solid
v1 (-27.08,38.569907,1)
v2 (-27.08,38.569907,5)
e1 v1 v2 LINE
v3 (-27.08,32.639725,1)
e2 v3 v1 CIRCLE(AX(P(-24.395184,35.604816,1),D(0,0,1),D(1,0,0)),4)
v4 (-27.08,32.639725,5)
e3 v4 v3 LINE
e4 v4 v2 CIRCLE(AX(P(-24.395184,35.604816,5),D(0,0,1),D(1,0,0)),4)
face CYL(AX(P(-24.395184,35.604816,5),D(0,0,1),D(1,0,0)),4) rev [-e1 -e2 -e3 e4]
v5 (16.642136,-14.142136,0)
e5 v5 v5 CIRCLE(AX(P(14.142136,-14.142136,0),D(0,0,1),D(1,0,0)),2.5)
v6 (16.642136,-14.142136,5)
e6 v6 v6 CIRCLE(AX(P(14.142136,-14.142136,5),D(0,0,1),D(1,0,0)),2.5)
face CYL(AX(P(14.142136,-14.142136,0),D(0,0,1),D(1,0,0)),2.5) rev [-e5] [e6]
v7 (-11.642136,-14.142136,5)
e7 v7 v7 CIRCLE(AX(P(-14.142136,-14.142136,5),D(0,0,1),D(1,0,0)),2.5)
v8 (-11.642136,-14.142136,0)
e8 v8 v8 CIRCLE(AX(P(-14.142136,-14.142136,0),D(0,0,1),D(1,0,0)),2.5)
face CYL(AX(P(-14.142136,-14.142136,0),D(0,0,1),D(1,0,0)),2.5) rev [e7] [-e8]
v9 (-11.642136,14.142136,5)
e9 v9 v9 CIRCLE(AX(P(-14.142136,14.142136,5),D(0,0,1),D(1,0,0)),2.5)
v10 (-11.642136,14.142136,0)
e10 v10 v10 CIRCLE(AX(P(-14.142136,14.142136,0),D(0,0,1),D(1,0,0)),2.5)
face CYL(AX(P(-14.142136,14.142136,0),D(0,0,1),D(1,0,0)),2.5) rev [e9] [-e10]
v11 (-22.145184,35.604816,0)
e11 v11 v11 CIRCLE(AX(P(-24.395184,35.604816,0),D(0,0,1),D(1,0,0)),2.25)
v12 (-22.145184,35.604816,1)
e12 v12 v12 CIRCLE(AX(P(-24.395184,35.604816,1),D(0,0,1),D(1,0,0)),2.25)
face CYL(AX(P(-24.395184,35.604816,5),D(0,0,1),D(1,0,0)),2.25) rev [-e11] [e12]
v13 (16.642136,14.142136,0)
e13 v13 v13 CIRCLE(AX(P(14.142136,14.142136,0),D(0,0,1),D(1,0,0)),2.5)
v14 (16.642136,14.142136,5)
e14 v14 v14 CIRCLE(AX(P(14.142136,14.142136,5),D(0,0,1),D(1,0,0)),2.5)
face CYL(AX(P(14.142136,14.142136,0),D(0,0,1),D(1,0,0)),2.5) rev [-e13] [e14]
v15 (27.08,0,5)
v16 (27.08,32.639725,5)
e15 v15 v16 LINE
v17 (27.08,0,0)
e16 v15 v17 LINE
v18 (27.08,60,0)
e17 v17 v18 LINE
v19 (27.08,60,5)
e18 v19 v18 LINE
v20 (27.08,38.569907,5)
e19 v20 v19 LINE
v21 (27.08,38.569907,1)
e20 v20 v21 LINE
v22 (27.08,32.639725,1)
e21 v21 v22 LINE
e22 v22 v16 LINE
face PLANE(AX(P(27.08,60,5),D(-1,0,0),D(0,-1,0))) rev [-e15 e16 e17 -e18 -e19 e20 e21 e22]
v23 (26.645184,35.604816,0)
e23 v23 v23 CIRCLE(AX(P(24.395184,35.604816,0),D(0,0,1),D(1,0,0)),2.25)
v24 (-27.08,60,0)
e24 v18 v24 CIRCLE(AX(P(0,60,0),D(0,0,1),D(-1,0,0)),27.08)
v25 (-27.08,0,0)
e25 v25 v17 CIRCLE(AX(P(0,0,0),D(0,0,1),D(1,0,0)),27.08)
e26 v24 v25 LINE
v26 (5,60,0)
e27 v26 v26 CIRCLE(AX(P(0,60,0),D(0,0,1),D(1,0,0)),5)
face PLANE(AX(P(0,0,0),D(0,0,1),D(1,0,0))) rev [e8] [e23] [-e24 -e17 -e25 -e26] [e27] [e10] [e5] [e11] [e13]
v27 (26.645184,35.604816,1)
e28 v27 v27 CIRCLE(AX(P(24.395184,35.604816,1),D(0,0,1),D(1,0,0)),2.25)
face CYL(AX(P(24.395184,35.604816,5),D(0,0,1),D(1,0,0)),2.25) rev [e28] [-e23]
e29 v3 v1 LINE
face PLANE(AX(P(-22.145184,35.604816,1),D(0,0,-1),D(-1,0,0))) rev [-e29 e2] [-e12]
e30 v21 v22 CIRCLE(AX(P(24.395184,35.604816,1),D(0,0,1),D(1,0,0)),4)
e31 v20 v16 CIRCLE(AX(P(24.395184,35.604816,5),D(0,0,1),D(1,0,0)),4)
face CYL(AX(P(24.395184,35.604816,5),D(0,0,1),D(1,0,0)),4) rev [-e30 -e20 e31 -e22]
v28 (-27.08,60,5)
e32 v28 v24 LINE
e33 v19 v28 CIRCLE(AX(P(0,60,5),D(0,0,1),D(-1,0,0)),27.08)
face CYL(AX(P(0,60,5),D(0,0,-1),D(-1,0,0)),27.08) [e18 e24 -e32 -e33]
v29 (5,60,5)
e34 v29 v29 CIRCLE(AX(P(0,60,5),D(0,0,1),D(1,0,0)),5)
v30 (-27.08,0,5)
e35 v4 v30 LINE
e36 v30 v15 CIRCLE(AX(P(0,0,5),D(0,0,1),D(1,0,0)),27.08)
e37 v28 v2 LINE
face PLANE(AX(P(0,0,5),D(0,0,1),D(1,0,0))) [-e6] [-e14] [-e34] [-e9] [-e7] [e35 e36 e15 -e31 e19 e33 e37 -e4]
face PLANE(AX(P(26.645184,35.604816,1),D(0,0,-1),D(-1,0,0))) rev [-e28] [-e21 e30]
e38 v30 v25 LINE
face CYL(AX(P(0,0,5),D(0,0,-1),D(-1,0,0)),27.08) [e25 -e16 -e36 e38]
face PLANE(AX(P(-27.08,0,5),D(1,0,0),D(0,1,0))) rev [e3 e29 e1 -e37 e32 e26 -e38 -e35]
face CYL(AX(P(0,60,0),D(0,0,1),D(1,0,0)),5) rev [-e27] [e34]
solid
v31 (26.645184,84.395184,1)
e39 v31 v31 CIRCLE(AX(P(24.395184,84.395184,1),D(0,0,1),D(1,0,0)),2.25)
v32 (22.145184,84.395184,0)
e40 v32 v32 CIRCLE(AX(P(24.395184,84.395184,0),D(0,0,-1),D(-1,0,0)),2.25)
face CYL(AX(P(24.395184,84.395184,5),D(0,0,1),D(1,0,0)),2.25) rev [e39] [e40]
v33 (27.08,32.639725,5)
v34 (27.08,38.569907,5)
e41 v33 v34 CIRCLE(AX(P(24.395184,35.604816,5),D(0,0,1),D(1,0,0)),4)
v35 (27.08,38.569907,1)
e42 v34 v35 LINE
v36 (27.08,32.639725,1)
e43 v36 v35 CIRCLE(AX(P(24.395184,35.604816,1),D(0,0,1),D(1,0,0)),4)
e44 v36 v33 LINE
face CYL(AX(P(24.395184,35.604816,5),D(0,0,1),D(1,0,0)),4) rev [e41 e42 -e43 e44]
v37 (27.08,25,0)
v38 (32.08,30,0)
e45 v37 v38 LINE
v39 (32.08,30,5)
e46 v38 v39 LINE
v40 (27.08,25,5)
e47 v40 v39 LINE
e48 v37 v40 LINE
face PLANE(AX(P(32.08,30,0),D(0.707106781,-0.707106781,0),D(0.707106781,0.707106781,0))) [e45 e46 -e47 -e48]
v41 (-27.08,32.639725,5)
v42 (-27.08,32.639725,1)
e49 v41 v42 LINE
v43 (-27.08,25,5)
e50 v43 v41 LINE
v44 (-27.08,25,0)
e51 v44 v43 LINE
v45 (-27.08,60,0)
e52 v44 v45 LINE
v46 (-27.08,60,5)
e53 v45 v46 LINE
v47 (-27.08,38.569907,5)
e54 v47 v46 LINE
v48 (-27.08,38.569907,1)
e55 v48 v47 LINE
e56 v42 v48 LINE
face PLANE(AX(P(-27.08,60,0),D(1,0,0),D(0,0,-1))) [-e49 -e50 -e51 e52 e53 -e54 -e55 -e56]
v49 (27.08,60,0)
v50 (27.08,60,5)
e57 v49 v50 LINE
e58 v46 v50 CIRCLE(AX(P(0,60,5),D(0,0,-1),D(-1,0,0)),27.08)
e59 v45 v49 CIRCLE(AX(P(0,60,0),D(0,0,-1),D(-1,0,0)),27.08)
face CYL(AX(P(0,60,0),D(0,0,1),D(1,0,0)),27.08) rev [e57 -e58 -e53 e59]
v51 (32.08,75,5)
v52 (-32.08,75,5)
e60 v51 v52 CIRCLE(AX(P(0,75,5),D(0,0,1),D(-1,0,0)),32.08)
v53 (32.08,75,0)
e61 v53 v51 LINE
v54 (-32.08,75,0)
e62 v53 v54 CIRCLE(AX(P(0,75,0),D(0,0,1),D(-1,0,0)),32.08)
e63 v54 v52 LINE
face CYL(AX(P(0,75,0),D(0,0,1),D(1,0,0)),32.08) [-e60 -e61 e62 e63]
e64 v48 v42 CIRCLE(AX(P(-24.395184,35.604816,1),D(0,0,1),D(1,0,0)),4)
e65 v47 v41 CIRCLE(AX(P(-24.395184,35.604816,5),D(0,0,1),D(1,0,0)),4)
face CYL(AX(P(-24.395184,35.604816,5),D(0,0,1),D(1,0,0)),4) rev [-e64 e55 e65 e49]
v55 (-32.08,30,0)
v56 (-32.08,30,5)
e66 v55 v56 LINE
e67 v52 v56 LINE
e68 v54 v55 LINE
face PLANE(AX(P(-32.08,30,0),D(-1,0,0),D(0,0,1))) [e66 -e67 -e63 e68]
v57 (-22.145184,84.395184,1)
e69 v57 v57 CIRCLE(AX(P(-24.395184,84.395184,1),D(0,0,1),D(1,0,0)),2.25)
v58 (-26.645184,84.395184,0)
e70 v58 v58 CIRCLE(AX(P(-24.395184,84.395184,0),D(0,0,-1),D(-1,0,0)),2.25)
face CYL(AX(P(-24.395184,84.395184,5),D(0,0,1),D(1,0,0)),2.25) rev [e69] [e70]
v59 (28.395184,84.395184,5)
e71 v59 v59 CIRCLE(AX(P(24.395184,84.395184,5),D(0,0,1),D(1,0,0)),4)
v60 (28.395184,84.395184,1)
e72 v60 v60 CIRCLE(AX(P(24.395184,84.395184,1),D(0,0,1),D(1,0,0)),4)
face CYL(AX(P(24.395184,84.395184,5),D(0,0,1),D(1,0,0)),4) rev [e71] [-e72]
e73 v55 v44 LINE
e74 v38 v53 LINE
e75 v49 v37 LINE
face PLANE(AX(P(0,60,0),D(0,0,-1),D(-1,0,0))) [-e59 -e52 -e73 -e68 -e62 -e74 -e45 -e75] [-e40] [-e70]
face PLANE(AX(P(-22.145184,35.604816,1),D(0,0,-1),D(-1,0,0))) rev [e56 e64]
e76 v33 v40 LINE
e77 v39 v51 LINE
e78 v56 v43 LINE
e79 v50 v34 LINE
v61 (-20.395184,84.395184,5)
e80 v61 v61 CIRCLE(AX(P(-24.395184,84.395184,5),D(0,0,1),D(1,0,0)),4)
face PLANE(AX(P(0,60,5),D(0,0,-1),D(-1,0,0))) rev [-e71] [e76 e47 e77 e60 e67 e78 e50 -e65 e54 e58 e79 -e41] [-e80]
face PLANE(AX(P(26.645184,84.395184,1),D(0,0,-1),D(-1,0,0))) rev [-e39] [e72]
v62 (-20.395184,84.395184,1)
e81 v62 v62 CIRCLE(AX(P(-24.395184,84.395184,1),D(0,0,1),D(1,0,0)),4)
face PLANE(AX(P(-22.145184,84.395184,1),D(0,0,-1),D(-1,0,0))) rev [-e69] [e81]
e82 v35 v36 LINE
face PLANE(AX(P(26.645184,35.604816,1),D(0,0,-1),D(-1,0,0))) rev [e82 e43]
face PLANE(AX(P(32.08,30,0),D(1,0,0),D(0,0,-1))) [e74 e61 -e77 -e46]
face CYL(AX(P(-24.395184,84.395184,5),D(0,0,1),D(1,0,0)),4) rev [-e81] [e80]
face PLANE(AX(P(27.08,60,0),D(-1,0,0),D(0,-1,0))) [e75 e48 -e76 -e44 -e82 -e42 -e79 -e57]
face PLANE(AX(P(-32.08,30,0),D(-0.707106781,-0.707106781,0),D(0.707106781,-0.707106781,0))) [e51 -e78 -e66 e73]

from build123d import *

# Parameters (mm, degrees)
BOSS_EXTRUDE1_DEPTH            = 5
SKETCH2_R                      = 2.5
CUT_EXTRUDE1_DEPTH             = 5
SKETCH3_R                      = 5
CUT_EXTRUDE2_DEPTH             = 5
BOSS_EXTRUDE2_DEPTH            = 5
CBORE_START                    = 1
CBORE_FOR_M4_SHCS1_OUTLINE_R   = 4
CBORE_FOR_M4_SHCS1_DEPTH       = 4
CBORE_FOR_M4_SHCS1_2_OUTLINE_R = 2.25
CBORE_FOR_M4_SHCS1_2_DEPTH     = 1


# Read off the part's stored shape, not the designer's step: CBORE for M4 SHCS1
with BuildPart() as part:
    # Sketch1 → Boss-Extrude1 (new body)
    with BuildSketch(Plane.XY):
        with BuildLine():
            Line((-27.08, 0), (-27.08, 60))
            ThreePointArc((-27.08, 60), (0, 87.08), (27.08, 60))
            Line((27.08, 60), (27.08, 0))
            ThreePointArc((27.08, 0), (0, -27.08), (-27.08, 0))
        make_face()
    extrude(amount=BOSS_EXTRUDE1_DEPTH)

    # Sketch2 → Cut-Extrude1 (cut)
    with BuildSketch(Plane.XY.offset(5)):
        with Locations((14.142135624, 14.142135624)):
            Circle(SKETCH2_R)
        with Locations((14.142135624, -14.142135624)):
            Circle(SKETCH2_R)
        with Locations((-14.142135624, -14.142135624)):
            Circle(SKETCH2_R)
        with Locations((-14.142135624, 14.142135624)):
            Circle(SKETCH2_R)
    extrude(amount=-CUT_EXTRUDE1_DEPTH, mode=Mode.SUBTRACT)

    # Sketch3 → Cut-Extrude2 (cut)
    with BuildSketch(Plane.XY.offset(5)):
        with Locations((0, 60)):
            Circle(SKETCH3_R)
    extrude(amount=-CUT_EXTRUDE2_DEPTH, mode=Mode.SUBTRACT)


with BuildPart() as body_2:
    # Sketch5 → Boss-Extrude2 (new body)
    with BuildSketch(Plane.XY.offset(5)):
        with BuildLine():
            Line((-32.08, 30), (-32.08, 75))
            ThreePointArc((-32.08, 75), (0, 107.08), (32.08, 75))
            Line((32.08, 75), (32.08, 30))
            Line((32.08, 30), (27.08, 25))
            Line((27.08, 25), (27.08, 60))
            ThreePointArc((27.08, 60), (0, 87.08), (-27.08, 60))
            Line((-27.08, 60), (-27.08, 25))
            Line((-27.08, 25), (-32.08, 30))
        make_face()
    extrude(amount=-BOSS_EXTRUDE2_DEPTH)


with BuildPart() as cbore_for_m4_shcs1_tool:
    # CBORE for M4 SHCS1 outline → CBORE for M4 SHCS1 (new body)
    with BuildSketch(Plane.XY.offset(CBORE_START)):
        with BuildLine():
            ThreePointArc((-27.08, 38.569906736), (-28.395183951, 35.604816049), (-27.08, 32.639725362))
            ThreePointArc((-27.08, 32.639725362), (-20.395183951, 35.604816049), (-27.08, 38.569906736))
        make_face()
        with BuildLine():
            ThreePointArc((27.08, 32.639725362), (28.395183951, 35.604816049), (27.08, 38.569906736))
            ThreePointArc((27.08, 38.569906736), (20.395183951, 35.604816049), (27.08, 32.639725362))
        make_face()
        with Locations((24.395183951, 84.395183951)):
            Circle(CBORE_FOR_M4_SHCS1_OUTLINE_R)
        with Locations((-24.395183951, 84.395183951)):
            Circle(CBORE_FOR_M4_SHCS1_OUTLINE_R)
    extrude(amount=CBORE_FOR_M4_SHCS1_DEPTH)


with BuildPart() as part_1:
    add(part.part)

    # CBORE for M4 SHCS1: cut by cbore_for_m4_shcs1_tool
    add(cbore_for_m4_shcs1_tool.part, mode=Mode.SUBTRACT)


with BuildPart() as body_2_1:
    add(body_2.part)

    # CBORE for M4 SHCS1: cut by cbore_for_m4_shcs1_tool
    add(cbore_for_m4_shcs1_tool.part, mode=Mode.SUBTRACT)


with BuildPart() as cbore_for_m4_shcs1_2_tool:
    # CBORE for M4 SHCS1 2 outline → CBORE for M4 SHCS1 2 (new body)
    with BuildSketch(Plane.XY):
        with Locations((24.395183951, 84.395183951)):
            Circle(CBORE_FOR_M4_SHCS1_2_OUTLINE_R)
        with Locations((-24.395183951, 84.395183951)):
            Circle(CBORE_FOR_M4_SHCS1_2_OUTLINE_R)
        with Locations((-24.395183951, 35.604816049)):
            Circle(CBORE_FOR_M4_SHCS1_2_OUTLINE_R)
        with Locations((24.395183951, 35.604816049)):
            Circle(CBORE_FOR_M4_SHCS1_2_OUTLINE_R)
    extrude(amount=CBORE_FOR_M4_SHCS1_2_DEPTH)


with BuildPart() as part_2:
    add(part_1.part)

    # CBORE for M4 SHCS1 2: cut by cbore_for_m4_shcs1_2_tool
    add(cbore_for_m4_shcs1_2_tool.part, mode=Mode.SUBTRACT)


with BuildPart() as body_2_2:
    add(body_2_1.part)

    # CBORE for M4 SHCS1 2: cut by cbore_for_m4_shcs1_2_tool
    add(cbore_for_m4_shcs1_2_tool.part, mode=Mode.SUBTRACT)


solid = Compound([part_2.part, body_2_2.part])
